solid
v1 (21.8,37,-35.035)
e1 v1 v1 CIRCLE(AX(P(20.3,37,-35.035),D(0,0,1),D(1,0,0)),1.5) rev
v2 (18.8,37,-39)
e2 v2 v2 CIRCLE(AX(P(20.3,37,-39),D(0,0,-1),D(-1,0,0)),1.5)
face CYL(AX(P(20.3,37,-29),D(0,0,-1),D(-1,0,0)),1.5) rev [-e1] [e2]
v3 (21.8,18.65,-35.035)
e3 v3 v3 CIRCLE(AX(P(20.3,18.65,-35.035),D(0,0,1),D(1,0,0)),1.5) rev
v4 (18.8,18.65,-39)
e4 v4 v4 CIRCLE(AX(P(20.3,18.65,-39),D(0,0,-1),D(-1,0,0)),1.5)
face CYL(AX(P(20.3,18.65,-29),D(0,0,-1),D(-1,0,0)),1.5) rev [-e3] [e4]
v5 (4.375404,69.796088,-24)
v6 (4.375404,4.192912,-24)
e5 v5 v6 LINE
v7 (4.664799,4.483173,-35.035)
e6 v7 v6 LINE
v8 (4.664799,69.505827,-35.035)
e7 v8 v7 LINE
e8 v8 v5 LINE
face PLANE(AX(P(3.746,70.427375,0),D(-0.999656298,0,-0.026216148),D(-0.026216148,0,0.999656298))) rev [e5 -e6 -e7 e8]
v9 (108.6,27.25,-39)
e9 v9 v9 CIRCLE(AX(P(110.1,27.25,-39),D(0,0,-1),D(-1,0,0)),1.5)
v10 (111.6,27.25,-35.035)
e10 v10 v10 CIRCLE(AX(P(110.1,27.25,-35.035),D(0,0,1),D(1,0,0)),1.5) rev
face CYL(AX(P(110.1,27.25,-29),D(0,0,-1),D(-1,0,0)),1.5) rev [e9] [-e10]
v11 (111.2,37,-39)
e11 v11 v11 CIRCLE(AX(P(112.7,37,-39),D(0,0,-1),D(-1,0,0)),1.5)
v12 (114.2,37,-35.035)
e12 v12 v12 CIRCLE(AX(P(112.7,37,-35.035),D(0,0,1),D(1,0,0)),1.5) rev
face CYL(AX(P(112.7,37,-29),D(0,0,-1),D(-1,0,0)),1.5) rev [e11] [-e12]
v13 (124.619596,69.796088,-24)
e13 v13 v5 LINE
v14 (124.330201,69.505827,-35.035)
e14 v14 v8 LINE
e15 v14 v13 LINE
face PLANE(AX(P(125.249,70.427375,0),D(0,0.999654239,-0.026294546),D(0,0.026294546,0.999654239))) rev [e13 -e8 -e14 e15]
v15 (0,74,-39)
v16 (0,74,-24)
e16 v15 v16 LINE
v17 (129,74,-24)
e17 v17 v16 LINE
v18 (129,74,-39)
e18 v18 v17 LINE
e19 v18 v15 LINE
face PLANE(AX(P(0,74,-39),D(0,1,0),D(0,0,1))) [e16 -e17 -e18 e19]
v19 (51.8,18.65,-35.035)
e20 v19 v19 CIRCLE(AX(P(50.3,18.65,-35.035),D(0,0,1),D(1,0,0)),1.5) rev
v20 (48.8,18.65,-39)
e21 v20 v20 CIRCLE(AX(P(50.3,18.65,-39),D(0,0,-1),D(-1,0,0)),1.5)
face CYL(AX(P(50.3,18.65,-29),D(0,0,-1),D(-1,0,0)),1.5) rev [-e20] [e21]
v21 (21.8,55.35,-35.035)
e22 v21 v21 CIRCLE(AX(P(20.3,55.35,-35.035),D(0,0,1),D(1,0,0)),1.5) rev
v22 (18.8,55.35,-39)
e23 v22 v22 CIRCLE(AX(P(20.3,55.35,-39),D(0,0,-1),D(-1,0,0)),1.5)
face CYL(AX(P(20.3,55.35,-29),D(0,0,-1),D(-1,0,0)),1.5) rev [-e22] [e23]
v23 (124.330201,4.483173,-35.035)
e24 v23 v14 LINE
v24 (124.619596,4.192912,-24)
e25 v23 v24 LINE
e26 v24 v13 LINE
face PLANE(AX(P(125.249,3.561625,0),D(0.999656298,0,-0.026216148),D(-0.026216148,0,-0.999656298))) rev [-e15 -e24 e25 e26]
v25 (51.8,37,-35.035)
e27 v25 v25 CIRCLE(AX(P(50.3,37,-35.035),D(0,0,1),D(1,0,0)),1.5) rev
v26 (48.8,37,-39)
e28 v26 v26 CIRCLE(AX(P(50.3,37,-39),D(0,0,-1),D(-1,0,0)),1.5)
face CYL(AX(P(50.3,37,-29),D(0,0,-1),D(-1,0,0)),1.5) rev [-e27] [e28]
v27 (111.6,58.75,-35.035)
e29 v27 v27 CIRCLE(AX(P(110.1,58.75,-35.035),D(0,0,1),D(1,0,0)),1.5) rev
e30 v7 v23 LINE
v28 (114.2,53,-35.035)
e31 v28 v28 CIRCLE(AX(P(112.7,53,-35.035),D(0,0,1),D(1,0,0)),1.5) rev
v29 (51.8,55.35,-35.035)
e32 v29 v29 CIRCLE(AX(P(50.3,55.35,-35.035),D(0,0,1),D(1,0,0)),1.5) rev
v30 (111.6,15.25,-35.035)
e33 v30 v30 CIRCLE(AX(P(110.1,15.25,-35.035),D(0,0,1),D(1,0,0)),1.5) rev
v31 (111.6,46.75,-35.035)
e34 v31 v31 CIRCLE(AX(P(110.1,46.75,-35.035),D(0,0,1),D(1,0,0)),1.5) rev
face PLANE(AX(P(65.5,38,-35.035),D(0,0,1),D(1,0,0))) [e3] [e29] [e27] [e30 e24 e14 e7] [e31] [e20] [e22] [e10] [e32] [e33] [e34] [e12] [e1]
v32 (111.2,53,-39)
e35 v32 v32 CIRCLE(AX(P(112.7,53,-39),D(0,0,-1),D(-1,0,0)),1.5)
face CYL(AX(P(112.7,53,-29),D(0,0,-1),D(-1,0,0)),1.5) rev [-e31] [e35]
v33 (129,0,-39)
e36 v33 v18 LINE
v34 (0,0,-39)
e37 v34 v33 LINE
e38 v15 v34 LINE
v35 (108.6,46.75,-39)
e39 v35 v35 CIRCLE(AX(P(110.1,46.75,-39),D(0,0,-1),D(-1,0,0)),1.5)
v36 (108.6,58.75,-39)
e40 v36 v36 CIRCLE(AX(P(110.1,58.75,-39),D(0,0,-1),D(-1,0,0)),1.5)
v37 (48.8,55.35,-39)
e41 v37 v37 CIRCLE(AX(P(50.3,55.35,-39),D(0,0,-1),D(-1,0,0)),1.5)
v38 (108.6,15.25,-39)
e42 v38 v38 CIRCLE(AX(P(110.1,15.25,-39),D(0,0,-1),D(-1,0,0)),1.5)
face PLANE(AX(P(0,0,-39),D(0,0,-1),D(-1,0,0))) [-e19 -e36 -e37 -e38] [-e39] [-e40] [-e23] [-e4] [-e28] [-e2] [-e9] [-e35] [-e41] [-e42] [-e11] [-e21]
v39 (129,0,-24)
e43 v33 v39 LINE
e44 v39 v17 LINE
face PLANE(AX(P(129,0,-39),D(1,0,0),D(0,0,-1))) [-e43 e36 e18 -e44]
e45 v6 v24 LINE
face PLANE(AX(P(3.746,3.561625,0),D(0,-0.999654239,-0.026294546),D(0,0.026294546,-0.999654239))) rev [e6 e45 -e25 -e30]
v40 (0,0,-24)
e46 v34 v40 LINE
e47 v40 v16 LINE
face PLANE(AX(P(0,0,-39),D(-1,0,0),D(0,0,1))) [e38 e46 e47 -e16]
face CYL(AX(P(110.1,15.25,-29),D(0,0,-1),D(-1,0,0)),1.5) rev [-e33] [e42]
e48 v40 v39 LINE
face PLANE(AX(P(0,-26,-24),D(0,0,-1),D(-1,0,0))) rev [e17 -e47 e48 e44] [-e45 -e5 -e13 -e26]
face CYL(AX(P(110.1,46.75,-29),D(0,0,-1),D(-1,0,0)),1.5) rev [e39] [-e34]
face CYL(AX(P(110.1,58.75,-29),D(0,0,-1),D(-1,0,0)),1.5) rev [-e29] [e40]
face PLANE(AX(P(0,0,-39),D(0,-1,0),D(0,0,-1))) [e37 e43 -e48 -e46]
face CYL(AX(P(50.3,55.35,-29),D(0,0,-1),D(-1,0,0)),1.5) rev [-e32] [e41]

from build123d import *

# Parameters (mm, degrees)
SKETCH1_W           = 129
SKETCH1_H           = 74
BOSS_EXTRUDE1_DEPTH = 39
SKETCH2_R           = 1.5
CUT_EXTRUDE1_DEPTH  = 10
SKETCH4_W           = 129
SKETCH4_H           = 24
CUT_EXTRUDE3_DEPTH  = 100


with BuildPart() as part:
    # Sketch1 → Boss-Extrude1 (new body)
    with BuildSketch(Plane.XY):
        with Locations((64.5, 37)):
            Rectangle(SKETCH1_W, SKETCH1_H)
    extrude(amount=-BOSS_EXTRUDE1_DEPTH)

    # Sketch2 → Cut-Extrude1 (cut)
    with BuildSketch(Plane(origin=(0, 0, -39), x_dir=(-1, 0, 0), z_dir=(0, 0, -1))):
        with Locations((-50.3, 37)):
            Circle(SKETCH2_R)
        with Locations((-50.3, 55.35)):
            Circle(SKETCH2_R)
        with Locations((-50.3, 18.65)):
            Circle(SKETCH2_R)
        with Locations((-20.3, 55.35)):
            Circle(SKETCH2_R)
        with Locations((-20.3, 37)):
            Circle(SKETCH2_R)
        with Locations((-20.3, 18.65)):
            Circle(SKETCH2_R)
        with Locations((-112.7, 37)):
            Circle(SKETCH2_R)
        with Locations((-112.7, 53)):
            Circle(SKETCH2_R)
        with Locations((-110.1, 58.75)):
            Circle(SKETCH2_R)
        with Locations((-110.1, 46.75)):
            Circle(SKETCH2_R)
        with Locations((-110.1, 15.25)):
            Circle(SKETCH2_R)
        with Locations((-110.1, 27.25)):
            Circle(SKETCH2_R)
    extrude(amount=-CUT_EXTRUDE1_DEPTH, mode=Mode.SUBTRACT)

    # Cavity1: read off the stored shape, not the designer's step
    # Cavity1: loft between two sections, ruled curve by curve
    cavity1_from = [
        Edge.make_line((125.249, 3.561625, 0), (125.249, 70.427375, 0)),
        Edge.make_line((3.746, 3.561625, 0), (125.249, 3.561625, 0)),
        Edge.make_line((3.746, 70.427375, 0), (3.746, 3.561625, 0)),
        Edge.make_line((125.249, 70.427375, 0), (3.746, 70.427375, 0)),
    ]
    cavity1_to = [
        Edge.make_line((124.330201477, 4.483173045, -35.035), (124.330201477, 69.505826955, -35.035)),
        Edge.make_line((4.664798523, 4.483173045, -35.035), (124.330201477, 4.483173045, -35.035)),
        Edge.make_line((4.664798523, 69.505826955, -35.035), (4.664798523, 4.483173045, -35.035)),
        Edge.make_line((124.330201477, 69.505826955, -35.035), (4.664798523, 69.505826955, -35.035)),
    ]
    cavity1 = Solid(Shell([*[Face.make_surface_from_curves(cavity1_from[k], cavity1_to[k]) for k in range(4)], Face(Wire(cavity1_from)), Face(Wire(cavity1_to))]))
    add(cavity1, mode=Mode.SUBTRACT)

    # Sketch4 → Cut-Extrude3 (cut)
    with BuildSketch(Plane(origin=(0, 74, 0), x_dir=(1, 0, 0), z_dir=(0, 1, 0))):
        with Locations((64.5, 12)):
            Rectangle(SKETCH4_W, SKETCH4_H)
    extrude(amount=-CUT_EXTRUDE3_DEPTH, mode=Mode.SUBTRACT)


solid = part.part
